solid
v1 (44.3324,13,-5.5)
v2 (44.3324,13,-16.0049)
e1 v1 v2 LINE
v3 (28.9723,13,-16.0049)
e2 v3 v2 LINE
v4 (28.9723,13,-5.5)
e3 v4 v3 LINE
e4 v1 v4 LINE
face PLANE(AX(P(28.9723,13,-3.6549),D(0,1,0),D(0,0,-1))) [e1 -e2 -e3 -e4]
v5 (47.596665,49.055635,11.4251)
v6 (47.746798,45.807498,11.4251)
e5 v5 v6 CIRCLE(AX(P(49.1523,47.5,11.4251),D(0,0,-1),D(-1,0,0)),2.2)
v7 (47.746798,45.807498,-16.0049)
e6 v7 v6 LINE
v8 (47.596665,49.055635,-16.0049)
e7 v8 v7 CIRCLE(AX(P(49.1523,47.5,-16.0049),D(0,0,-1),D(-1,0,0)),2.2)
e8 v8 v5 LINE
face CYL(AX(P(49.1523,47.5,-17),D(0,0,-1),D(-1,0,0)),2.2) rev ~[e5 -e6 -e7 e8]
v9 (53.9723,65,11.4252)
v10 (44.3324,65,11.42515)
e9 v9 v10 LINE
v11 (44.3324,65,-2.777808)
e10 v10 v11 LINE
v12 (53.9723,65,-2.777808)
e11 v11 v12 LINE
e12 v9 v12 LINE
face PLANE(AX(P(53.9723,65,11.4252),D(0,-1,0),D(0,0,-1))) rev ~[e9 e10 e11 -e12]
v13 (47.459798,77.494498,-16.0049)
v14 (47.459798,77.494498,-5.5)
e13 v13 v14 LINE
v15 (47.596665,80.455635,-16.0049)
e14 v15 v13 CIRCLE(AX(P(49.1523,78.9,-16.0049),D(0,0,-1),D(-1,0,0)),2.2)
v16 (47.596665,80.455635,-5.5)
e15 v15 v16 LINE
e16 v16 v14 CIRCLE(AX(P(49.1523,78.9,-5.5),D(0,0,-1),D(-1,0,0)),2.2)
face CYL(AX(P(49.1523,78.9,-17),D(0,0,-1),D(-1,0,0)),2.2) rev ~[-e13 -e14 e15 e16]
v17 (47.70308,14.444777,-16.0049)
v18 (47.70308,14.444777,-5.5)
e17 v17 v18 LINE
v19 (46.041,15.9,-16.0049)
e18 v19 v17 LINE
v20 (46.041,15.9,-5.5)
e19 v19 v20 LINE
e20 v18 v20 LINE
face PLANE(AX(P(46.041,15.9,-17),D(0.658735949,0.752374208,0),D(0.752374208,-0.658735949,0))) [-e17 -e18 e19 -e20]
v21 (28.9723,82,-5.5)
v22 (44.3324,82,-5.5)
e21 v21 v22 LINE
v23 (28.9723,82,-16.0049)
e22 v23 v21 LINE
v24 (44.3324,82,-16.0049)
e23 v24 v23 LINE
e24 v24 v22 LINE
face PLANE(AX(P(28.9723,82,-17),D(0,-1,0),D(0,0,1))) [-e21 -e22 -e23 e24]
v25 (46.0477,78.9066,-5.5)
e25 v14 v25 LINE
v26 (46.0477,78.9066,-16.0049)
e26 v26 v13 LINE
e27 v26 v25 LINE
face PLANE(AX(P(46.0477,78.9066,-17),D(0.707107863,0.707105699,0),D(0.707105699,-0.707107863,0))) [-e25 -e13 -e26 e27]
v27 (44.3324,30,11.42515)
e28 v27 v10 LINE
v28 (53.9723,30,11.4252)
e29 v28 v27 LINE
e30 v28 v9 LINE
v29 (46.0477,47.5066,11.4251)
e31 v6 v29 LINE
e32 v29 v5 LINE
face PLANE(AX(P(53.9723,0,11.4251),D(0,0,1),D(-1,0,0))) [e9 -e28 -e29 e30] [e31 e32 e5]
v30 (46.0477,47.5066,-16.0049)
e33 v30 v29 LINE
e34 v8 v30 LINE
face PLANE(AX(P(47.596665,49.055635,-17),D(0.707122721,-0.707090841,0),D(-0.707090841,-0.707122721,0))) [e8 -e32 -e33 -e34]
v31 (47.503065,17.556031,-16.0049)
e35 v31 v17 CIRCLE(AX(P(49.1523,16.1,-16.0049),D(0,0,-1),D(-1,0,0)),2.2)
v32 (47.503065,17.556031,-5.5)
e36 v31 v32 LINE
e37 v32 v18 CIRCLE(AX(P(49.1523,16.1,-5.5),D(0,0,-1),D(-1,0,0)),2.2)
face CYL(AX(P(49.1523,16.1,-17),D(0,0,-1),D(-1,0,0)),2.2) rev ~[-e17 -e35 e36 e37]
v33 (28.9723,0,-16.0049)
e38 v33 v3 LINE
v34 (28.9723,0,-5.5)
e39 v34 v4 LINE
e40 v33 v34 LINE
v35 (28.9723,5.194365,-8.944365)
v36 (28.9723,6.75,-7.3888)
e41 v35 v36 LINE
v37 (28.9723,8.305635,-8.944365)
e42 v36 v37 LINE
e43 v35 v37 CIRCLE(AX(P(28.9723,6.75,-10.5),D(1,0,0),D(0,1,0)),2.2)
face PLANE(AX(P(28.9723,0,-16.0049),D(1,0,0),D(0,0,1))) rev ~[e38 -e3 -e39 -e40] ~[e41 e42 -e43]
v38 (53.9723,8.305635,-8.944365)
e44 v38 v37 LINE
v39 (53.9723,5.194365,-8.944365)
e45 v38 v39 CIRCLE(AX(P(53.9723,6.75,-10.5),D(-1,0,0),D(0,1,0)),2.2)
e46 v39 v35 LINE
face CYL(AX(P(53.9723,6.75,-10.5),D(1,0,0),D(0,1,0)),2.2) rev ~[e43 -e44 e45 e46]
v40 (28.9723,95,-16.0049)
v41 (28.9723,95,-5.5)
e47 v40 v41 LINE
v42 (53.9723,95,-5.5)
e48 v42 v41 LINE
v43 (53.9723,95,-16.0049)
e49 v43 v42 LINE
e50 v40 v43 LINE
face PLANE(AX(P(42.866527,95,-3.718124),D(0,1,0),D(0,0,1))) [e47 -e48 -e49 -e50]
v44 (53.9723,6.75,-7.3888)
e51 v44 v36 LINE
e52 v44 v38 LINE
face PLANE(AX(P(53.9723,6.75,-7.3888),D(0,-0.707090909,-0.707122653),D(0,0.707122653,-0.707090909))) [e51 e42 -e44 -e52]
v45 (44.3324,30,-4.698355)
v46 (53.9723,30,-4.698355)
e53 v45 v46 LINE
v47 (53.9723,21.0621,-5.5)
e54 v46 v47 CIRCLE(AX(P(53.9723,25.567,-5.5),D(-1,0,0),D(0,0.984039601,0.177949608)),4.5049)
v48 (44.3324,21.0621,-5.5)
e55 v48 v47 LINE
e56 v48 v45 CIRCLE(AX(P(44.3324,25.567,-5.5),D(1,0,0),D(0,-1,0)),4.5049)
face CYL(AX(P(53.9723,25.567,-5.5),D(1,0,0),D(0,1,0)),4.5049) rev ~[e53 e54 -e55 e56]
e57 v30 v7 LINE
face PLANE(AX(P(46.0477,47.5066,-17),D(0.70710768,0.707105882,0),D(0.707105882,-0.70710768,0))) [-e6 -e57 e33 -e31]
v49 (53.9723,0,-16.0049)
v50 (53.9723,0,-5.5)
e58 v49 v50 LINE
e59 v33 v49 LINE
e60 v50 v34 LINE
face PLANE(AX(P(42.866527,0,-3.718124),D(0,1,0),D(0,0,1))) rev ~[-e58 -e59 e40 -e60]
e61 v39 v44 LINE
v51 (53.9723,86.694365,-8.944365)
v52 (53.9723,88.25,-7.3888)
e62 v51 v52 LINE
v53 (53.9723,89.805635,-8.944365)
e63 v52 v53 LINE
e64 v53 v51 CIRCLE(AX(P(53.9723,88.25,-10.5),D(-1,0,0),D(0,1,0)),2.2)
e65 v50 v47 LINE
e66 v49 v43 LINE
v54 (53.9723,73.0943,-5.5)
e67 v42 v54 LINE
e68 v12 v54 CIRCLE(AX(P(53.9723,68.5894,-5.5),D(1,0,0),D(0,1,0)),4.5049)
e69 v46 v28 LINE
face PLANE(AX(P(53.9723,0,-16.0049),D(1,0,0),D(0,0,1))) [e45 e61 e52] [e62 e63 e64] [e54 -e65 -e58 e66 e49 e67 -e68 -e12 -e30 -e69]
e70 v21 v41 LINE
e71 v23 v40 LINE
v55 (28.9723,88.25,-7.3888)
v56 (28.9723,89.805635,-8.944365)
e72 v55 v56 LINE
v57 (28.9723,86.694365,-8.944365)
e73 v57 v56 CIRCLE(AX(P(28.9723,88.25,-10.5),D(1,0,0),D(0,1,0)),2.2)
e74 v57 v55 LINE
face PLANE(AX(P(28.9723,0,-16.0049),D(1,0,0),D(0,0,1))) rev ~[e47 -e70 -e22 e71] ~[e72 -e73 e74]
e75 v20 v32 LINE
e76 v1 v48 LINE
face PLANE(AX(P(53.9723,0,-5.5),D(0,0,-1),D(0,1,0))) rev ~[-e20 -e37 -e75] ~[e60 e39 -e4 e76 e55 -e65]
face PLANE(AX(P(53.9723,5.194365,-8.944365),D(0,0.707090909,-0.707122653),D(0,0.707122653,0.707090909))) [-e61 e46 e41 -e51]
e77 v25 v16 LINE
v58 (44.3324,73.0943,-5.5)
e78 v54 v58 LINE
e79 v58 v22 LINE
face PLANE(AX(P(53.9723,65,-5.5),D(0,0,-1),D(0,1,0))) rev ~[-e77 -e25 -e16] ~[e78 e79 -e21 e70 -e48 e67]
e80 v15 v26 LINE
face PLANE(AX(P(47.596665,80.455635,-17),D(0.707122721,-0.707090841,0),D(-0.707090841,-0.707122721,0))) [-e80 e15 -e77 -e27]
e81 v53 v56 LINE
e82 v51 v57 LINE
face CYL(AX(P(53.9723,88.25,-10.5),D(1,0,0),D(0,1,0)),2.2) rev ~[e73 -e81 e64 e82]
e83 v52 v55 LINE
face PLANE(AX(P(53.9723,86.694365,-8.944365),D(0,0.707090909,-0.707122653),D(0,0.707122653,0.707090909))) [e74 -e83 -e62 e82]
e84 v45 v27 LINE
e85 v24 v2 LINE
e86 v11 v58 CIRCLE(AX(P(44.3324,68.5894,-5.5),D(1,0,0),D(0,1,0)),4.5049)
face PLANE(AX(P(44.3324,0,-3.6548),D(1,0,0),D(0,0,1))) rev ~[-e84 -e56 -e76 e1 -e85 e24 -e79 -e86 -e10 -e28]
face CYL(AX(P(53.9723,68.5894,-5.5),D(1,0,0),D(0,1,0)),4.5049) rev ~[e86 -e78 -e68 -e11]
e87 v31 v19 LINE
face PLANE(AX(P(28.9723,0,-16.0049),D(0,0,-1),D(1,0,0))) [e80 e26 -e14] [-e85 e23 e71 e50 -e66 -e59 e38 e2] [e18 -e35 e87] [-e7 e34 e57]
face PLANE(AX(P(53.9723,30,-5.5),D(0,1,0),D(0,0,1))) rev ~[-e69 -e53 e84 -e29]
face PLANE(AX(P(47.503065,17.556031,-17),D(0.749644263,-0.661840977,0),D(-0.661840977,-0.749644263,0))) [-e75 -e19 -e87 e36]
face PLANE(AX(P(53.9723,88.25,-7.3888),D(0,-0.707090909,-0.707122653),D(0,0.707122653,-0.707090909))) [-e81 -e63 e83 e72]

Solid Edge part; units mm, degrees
sketch "Sketch1" plane through (0, 0, 0) normal (0, -1, 0) x (1, 0, 0)
  line L0 (28.9723, -16.0049) -> (28.9723, -4)
  line L1 (30.8556, 0.4736) -> (28.9723, -4)
  line L2 (41.8072, 11.4251) -> (30.8556, 0.4736)
  line L3 (53.9723, 11.4251) -> (41.8072, 11.4251)
  line L4 (53.9723, -16.0049) -> (53.9723, 11.4251)
  line L5 (28.9723, -16.0049) -> (53.9723, -16.0049)
  dimension "D1" = 8.9878
  dimension "D2" = 5.2
  dimension "D3" = 27.43
extrude "Protrusion1" add sketch "Sketch1" against normal blind 95
sketch "Sketch2" plane through (53.9723, 47.5, 1.7845) normal (1, 0, 0) x (0, 1, 0)
  line L0 (39.1944, -10.7289) -> (40.75, -9.1733)
  line L1 (40.75, -9.1733) -> (42.3056, -10.7289)
  arc A0 (42.3056, -10.7289) -> (39.1944, -10.7289) centre (40.75, -12.2845) cw
  line L2 (-42.3056, -10.7289) -> (-40.75, -9.1733)
  line L3 (-40.75, -9.1733) -> (-39.1944, -10.7289)
  arc A1 (-39.1944, -10.7289) -> (-42.3056, -10.7289) centre (-40.75, -12.2845) cw
  dimension "D1" = 6.75
  dimension "D2" = 6.5
  dimension "D3" = 47.5
extrude "ExtrudedCutout_1" cut sketch "Sketch2" against normal blind 51.2416
sketch "Sketch3" plane through (41.4723, 0, -2.7874) normal (0, -1, 0) x (1, 0, 0)
  line L0 (2.8601, -0.8674) -> (2.8601, 15.2148)
  line L1 (2.8601, 15.2148) -> (-13.7847, 15.2148)
  line L2 (-13.7847, 15.2148) -> (-13.7847, -0.8674)
  line L3 (-13.7847, -0.8674) -> (2.8601, -0.8674)
extrude "ExtrudedCutout_12" cut sketch "Sketch3" against normal blind 115.4646
sketch "Sketch4" plane through (41.4723, 47.5, -17) normal (0, 0, -1) x (-1, 0, 0)
  line L0 (-6.1244, 32.9556) -> (-4.5754, 31.4066)
  line L1 (-4.5754, 31.4066) -> (-5.9875, 29.9945)
  arc A0 (-6.1244, 32.9556) -> (-5.9875, 29.9945) centre (-7.68, 31.4) ccw
  line L2 (-6.1244, 1.5556) -> (-4.5754, 0.0066)
  line L3 (-4.5754, 0.0066) -> (-6.2745, -1.6925)
  arc A1 (-6.1244, 1.5556) -> (-6.2745, -1.6925) centre (-7.68, 0) ccw
  line L4 (-6.0308, -29.944) -> (-4.5687, -31.6)
  line L5 (-4.5687, -31.6) -> (-6.2308, -33.0552)
  arc A2 (-6.0308, -29.944) -> (-6.2308, -33.0552) centre (-7.68, -31.4) ccw
extrude "ExtrudedCutout_14" cut sketch "Sketch4" against normal blind 69.6341
sketch "Sketch5" plane through (28.9723, 47.5, -10.5) normal (-1, 0, 0) x (0, -1, 0)
  line L0 (-34.5, -6.5) -> (-34.5, 6.8451)
  line L1 (-34.5, 6.8451) -> (34.5, 6.8451)
  line L2 (34.5, 6.8451) -> (34.5, -6.5)
  line L3 (34.5, -6.5) -> (-34.5, -6.5)
  dimension "D1" = 13
  dimension "D2" = 13
extrude "Cutout1" cut sketch "Sketch5" against normal up to surface (15.3601 mm away)
sketch "Sketch6" plane through (53.9723, 47.5, -2.7874) normal (1, 0, 0) x (0, 1, 0)
  line L0 (-17.5, -2.7126) -> (-17.5, 14.2126)
  line L1 (-17.5, 14.2126) -> (-47.5, 14.2126)
  line L2 (-47.5, 14.2126) -> (-47.5, -2.7126)
  line L3 (-47.5, -2.7126) -> (-37.5, -2.7126)
  line L4 (-37.5, -2.7126) -> (-17.5, -2.7126)
  line L5 (17.5, 14.2126) -> (17.5, -2.7126)
  line L6 (17.5, -2.7126) -> (37.5, -2.7126)
  line L7 (37.5, -2.7126) -> (47.5, -2.7126)
  line L8 (47.5, 14.2126) -> (47.5, -2.7126)
  line L9 (47.5, 14.2126) -> (17.5, 14.2126)
extrude "ExtrudedCutout_18" cut sketch "Sketch6" against normal blind 89.0785
sketch "Sketch7" plane through (53.9723, 47.5, -2.2899) normal (1, 0, 0) x (0, 1, 0)
  circle A0 centre (21.0894, -3.2101) radius 4.5049
  circle A1 centre (-21.933, -3.2101) radius 4.5049
  dimension "D1" = 6
  dimension "D2" = 6
extrude "Cutout2" cut sketch "Sketch7" against normal up to vertex (21.3514 mm away)
properties material "ABS Plastic, high impact"
